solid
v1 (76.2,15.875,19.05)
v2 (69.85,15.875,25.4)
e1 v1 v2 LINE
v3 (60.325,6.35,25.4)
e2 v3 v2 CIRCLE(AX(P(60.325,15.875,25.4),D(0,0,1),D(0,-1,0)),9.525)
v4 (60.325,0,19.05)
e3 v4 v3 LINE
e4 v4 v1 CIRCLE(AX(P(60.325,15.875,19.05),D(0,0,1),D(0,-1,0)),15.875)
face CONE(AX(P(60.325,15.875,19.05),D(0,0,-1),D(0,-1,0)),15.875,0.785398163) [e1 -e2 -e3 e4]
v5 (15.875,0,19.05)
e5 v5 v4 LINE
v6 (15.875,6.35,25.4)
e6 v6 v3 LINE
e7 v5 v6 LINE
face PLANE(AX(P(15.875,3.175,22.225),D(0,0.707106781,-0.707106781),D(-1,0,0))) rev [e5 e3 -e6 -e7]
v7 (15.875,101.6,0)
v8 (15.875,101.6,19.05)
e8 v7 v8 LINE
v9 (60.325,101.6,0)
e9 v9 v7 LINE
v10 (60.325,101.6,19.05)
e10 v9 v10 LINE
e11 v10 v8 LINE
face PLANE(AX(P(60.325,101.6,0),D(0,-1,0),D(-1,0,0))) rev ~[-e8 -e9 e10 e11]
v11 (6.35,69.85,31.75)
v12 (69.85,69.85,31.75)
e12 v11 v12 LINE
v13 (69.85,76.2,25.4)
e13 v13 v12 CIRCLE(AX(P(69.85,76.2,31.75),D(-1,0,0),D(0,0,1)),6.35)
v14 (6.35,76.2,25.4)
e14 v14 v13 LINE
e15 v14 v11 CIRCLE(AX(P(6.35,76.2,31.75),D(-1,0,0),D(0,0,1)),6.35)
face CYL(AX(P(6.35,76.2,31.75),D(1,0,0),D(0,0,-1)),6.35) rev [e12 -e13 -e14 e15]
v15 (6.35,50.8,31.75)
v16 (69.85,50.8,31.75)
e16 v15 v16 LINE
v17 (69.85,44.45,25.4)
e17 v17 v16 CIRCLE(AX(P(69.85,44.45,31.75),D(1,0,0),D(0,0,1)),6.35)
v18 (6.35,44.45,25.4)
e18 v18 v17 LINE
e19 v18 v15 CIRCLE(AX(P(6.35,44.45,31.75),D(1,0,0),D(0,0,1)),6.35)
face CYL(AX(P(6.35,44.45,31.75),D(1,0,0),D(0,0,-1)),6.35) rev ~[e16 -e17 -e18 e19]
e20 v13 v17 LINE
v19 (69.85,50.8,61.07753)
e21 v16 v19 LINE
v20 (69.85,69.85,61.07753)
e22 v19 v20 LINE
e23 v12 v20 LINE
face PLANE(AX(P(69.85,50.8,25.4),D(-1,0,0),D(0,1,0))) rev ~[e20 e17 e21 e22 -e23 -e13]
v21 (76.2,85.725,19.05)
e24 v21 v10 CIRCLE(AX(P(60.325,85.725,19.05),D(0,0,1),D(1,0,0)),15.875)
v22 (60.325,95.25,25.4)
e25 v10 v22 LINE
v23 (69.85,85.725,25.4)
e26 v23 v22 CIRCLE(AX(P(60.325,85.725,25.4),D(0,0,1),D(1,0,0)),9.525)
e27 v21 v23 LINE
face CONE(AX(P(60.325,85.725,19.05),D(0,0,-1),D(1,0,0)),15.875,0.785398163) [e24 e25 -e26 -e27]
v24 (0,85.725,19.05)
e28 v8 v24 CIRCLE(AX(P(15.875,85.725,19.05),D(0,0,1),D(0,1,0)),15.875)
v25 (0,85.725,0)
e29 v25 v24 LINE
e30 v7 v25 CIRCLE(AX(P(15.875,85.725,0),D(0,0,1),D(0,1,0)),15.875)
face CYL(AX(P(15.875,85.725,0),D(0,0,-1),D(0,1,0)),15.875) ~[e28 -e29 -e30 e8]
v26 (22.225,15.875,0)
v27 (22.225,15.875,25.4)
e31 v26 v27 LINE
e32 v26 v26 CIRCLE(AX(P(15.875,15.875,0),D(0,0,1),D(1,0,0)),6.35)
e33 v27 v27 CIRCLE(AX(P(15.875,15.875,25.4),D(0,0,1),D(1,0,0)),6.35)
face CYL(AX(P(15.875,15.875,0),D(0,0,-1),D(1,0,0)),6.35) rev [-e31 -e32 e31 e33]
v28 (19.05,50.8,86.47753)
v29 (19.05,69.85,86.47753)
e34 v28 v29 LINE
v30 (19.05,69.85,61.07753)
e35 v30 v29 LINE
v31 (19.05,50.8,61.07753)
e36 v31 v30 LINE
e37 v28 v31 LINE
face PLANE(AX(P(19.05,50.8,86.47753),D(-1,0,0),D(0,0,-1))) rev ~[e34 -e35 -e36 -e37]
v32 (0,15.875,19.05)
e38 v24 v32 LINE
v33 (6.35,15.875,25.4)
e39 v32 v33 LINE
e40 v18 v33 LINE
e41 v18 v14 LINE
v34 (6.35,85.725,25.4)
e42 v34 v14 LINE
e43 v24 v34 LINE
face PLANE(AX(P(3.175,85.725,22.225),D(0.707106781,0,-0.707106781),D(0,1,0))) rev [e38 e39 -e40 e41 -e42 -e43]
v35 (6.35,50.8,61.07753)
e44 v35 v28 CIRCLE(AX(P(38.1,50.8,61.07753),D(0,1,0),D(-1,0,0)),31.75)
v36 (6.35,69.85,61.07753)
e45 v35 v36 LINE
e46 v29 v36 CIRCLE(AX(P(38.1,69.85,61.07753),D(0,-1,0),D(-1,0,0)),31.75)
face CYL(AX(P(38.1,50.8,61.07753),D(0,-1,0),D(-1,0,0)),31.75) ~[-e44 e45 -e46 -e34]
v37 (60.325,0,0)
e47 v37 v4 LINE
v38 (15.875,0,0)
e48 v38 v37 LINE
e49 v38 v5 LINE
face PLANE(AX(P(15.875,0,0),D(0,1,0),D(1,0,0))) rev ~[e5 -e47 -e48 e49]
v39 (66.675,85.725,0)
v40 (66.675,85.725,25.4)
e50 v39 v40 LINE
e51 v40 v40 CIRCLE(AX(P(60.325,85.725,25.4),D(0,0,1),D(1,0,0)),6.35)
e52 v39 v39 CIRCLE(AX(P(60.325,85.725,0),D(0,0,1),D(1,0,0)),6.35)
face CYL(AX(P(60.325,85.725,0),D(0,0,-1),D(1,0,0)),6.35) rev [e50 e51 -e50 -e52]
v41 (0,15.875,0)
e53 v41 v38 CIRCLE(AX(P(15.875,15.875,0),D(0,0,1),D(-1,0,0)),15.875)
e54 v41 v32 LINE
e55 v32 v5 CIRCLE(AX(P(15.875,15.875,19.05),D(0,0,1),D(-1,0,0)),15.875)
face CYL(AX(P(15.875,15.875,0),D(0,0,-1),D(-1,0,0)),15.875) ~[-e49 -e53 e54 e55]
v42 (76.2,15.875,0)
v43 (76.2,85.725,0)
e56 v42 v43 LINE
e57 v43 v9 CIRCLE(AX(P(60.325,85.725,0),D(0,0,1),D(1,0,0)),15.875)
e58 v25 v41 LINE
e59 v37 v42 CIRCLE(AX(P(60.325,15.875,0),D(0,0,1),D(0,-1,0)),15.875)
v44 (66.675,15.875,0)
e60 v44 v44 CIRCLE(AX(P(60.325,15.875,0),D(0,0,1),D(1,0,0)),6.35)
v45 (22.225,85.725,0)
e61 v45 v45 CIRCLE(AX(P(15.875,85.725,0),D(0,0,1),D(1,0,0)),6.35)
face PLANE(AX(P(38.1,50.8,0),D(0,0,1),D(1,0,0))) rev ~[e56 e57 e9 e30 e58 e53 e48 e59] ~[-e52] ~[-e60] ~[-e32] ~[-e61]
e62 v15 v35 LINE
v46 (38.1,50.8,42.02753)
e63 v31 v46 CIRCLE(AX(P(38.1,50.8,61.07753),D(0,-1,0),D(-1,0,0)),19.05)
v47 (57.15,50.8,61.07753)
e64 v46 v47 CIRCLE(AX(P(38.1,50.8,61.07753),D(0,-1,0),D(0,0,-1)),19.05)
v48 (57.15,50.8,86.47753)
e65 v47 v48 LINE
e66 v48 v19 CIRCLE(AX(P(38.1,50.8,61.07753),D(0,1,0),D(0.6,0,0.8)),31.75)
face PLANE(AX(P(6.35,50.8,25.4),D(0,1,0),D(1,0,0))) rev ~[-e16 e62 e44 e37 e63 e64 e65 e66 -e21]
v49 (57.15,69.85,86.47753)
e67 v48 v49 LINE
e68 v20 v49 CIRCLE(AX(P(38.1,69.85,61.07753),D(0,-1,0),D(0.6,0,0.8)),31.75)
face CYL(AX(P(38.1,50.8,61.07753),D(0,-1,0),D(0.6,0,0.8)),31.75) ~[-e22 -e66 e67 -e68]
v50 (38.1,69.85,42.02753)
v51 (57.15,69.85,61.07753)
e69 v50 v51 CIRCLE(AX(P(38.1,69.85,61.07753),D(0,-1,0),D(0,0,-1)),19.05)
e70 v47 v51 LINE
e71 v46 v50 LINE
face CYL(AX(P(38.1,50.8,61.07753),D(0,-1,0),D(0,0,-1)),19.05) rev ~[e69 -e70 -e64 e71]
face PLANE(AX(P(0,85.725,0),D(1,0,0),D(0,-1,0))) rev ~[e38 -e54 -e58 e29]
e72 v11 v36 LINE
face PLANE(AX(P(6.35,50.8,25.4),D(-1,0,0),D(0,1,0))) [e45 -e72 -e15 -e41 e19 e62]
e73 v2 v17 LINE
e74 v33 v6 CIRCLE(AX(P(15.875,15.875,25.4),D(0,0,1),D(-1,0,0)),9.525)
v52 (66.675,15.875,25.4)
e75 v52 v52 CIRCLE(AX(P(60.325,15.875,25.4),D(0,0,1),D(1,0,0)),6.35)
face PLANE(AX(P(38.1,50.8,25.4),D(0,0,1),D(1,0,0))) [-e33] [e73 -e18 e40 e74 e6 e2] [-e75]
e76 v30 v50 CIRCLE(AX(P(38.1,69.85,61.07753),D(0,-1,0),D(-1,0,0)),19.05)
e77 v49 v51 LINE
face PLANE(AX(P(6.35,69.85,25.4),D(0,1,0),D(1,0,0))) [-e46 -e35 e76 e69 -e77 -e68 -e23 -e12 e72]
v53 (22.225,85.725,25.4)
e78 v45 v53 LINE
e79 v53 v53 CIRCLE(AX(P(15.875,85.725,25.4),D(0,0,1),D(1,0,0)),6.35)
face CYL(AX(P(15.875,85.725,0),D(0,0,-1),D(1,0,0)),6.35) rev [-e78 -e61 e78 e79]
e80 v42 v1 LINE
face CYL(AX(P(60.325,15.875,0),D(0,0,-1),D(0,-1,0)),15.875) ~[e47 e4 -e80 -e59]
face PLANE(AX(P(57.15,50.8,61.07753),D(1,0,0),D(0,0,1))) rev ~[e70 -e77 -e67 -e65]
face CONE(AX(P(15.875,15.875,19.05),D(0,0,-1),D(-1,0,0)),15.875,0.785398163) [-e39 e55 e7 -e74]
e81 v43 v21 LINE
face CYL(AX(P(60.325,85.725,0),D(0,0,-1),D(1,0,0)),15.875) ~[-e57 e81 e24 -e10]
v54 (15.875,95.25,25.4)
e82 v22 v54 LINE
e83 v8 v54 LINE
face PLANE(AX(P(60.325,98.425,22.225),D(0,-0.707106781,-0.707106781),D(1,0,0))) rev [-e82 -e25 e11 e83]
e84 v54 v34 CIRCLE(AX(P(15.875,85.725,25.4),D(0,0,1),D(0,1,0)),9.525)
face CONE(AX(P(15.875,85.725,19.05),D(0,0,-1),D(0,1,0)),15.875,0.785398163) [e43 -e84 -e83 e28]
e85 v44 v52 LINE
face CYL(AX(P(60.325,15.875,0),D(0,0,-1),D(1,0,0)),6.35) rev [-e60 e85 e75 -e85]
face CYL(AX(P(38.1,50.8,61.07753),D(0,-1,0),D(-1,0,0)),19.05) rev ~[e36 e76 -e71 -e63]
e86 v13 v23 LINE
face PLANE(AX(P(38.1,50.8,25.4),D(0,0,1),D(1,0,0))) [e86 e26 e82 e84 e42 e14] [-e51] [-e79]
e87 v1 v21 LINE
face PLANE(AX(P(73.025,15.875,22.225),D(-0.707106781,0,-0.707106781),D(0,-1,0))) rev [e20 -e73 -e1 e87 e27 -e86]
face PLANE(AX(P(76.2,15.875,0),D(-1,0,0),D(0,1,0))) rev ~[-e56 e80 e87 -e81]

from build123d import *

# Parameters (mm, degrees)
F0_R     = 6.35
F1_DEPTH = 25.4
F2_SIZE  = 6.35
F3_W     = 63.5
F3_H     = 19.05
F4_DEPTH = 95.25
F5_R     = 6.35
F7_DEPTH = 50.801


with BuildPart() as f1:
    # F0 (on Top) → F1 (new body)
    with BuildSketch(Plane.XY):
        with BuildLine():
            ThreePointArc((0, 15.875), (4.6496798487, 4.6496798487), (15.875, 0))
            Line((15.875, 0), (60.325, 0))
            ThreePointArc((60.325, 0), (71.5503201513, 4.6496798487), (76.2, 15.875))
            Line((76.2, 15.875), (76.2, 85.725))
            ThreePointArc((76.2, 85.725), (71.5503201513, 96.9503201513), (60.325, 101.6))
            Line((60.325, 101.6), (15.875, 101.6))
            ThreePointArc((15.875, 101.6), (4.6496798487, 96.9503201513), (0, 85.725))
            Line((0, 85.725), (0, 15.875))
        make_face()
        with Locations((15.875, 15.875)):
            Circle(F0_R, mode=Mode.SUBTRACT)
        with Locations((60.325, 15.875)):
            Circle(F0_R, mode=Mode.SUBTRACT)
        with Locations((15.875, 85.725)):
            Circle(F0_R, mode=Mode.SUBTRACT)
        with Locations((60.325, 85.725)):
            Circle(F0_R, mode=Mode.SUBTRACT)
    extrude(amount=F1_DEPTH)

    # F2
    f2_edges = [f1.edges().sort_by_distance(p)[0] for p in [
        (38.1, 0, 25.4),
        (0, 50.8, 25.4),
        (4.64968, 4.64968, 25.4),
        (71.55032, 4.64968, 25.4),
        (76.2, 50.8, 25.4),
        (71.55032, 96.95032, 25.4),
        (38.1, 101.6, 25.4),
        (4.64968, 96.95032, 25.4),
    ]]
    chamfer(f2_edges, length=F2_SIZE)

    # F3 (on face) → F4 (join)
    with BuildSketch(Plane.XY.offset(25.4)):
        with Locations((38.1, 60.325)):
            Rectangle(F3_W, F3_H)
    extrude(amount=F4_DEPTH)

    # F5
    f5_edges = [f1.edges().sort_by_distance(p)[0] for p in [
        (38.1, 50.8, 25.4),
        (38.1, 69.85, 25.4),
    ]]
    fillet(f5_edges, radius=F5_R)

    # F6 (on face) → F7 (cut, through all)
    with BuildSketch(Plane.XZ.offset(-50.8)):
        with BuildLine():
            Line((6.35, 120.65), (6.35, 61.0775296334))
            ThreePointArc((6.35, 61.0775296334), (9.7019366858, 75.2765612905), (19.05, 86.4775296334))
            Line((19.05, 86.4775296334), (19.05, 120.65))
            Line((19.05, 120.65), (6.35, 120.65))
        make_face()
        with BuildLine():
            ThreePointArc((57.15, 61.0775296334), (38.1, 80.1275296334), (19.05, 61.0775296334))
            Line((19.05, 61.0775296334), (38.1, 61.0775296334))
            Line((38.1, 61.0775296334), (38.1, 42.0275296334))
            ThreePointArc((38.1, 42.0275296334), (51.5703841816, 47.6071454518), (57.15, 61.0775296334))
        make_face()
        with BuildLine():
            Line((19.05, 86.4775296334), (19.05, 61.0775296334))
            ThreePointArc((19.05, 61.0775296334), (38.1, 80.1275296334), (57.15, 61.0775296334))
            Line((57.15, 61.0775296334), (57.15, 86.4775296334))
            ThreePointArc((57.15, 86.4775296334), (38.1, 92.8275296334), (19.05, 86.4775296334))
        make_face()
        with BuildLine():
            Line((38.1, 61.0775296334), (19.05, 61.0775296334))
            ThreePointArc((19.05, 61.0775296334), (24.6296158184, 47.6071454518), (38.1, 42.0275296334))
            Line((38.1, 42.0275296334), (38.1, 61.0775296334))
        make_face()
        with BuildLine():
            Line((19.05, 120.65), (19.05, 86.4775296334))
            ThreePointArc((19.05, 86.4775296334), (38.1, 92.8275296334), (57.15, 86.4775296334))
            Line((57.15, 86.4775296334), (57.15, 120.65))
            Line((57.15, 120.65), (19.05, 120.65))
        make_face()
        with BuildLine():
            ThreePointArc((57.15, 86.4775296334), (66.4980633142, 75.2765612905), (69.85, 61.0775296334))
            Line((69.85, 61.0775296334), (69.85, 120.65))
            Line((69.85, 120.65), (57.15, 120.65))
            Line((57.15, 120.65), (57.15, 86.4775296334))
        make_face()
    extrude(amount=-F7_DEPTH, mode=Mode.SUBTRACT)


solid = f1.part
